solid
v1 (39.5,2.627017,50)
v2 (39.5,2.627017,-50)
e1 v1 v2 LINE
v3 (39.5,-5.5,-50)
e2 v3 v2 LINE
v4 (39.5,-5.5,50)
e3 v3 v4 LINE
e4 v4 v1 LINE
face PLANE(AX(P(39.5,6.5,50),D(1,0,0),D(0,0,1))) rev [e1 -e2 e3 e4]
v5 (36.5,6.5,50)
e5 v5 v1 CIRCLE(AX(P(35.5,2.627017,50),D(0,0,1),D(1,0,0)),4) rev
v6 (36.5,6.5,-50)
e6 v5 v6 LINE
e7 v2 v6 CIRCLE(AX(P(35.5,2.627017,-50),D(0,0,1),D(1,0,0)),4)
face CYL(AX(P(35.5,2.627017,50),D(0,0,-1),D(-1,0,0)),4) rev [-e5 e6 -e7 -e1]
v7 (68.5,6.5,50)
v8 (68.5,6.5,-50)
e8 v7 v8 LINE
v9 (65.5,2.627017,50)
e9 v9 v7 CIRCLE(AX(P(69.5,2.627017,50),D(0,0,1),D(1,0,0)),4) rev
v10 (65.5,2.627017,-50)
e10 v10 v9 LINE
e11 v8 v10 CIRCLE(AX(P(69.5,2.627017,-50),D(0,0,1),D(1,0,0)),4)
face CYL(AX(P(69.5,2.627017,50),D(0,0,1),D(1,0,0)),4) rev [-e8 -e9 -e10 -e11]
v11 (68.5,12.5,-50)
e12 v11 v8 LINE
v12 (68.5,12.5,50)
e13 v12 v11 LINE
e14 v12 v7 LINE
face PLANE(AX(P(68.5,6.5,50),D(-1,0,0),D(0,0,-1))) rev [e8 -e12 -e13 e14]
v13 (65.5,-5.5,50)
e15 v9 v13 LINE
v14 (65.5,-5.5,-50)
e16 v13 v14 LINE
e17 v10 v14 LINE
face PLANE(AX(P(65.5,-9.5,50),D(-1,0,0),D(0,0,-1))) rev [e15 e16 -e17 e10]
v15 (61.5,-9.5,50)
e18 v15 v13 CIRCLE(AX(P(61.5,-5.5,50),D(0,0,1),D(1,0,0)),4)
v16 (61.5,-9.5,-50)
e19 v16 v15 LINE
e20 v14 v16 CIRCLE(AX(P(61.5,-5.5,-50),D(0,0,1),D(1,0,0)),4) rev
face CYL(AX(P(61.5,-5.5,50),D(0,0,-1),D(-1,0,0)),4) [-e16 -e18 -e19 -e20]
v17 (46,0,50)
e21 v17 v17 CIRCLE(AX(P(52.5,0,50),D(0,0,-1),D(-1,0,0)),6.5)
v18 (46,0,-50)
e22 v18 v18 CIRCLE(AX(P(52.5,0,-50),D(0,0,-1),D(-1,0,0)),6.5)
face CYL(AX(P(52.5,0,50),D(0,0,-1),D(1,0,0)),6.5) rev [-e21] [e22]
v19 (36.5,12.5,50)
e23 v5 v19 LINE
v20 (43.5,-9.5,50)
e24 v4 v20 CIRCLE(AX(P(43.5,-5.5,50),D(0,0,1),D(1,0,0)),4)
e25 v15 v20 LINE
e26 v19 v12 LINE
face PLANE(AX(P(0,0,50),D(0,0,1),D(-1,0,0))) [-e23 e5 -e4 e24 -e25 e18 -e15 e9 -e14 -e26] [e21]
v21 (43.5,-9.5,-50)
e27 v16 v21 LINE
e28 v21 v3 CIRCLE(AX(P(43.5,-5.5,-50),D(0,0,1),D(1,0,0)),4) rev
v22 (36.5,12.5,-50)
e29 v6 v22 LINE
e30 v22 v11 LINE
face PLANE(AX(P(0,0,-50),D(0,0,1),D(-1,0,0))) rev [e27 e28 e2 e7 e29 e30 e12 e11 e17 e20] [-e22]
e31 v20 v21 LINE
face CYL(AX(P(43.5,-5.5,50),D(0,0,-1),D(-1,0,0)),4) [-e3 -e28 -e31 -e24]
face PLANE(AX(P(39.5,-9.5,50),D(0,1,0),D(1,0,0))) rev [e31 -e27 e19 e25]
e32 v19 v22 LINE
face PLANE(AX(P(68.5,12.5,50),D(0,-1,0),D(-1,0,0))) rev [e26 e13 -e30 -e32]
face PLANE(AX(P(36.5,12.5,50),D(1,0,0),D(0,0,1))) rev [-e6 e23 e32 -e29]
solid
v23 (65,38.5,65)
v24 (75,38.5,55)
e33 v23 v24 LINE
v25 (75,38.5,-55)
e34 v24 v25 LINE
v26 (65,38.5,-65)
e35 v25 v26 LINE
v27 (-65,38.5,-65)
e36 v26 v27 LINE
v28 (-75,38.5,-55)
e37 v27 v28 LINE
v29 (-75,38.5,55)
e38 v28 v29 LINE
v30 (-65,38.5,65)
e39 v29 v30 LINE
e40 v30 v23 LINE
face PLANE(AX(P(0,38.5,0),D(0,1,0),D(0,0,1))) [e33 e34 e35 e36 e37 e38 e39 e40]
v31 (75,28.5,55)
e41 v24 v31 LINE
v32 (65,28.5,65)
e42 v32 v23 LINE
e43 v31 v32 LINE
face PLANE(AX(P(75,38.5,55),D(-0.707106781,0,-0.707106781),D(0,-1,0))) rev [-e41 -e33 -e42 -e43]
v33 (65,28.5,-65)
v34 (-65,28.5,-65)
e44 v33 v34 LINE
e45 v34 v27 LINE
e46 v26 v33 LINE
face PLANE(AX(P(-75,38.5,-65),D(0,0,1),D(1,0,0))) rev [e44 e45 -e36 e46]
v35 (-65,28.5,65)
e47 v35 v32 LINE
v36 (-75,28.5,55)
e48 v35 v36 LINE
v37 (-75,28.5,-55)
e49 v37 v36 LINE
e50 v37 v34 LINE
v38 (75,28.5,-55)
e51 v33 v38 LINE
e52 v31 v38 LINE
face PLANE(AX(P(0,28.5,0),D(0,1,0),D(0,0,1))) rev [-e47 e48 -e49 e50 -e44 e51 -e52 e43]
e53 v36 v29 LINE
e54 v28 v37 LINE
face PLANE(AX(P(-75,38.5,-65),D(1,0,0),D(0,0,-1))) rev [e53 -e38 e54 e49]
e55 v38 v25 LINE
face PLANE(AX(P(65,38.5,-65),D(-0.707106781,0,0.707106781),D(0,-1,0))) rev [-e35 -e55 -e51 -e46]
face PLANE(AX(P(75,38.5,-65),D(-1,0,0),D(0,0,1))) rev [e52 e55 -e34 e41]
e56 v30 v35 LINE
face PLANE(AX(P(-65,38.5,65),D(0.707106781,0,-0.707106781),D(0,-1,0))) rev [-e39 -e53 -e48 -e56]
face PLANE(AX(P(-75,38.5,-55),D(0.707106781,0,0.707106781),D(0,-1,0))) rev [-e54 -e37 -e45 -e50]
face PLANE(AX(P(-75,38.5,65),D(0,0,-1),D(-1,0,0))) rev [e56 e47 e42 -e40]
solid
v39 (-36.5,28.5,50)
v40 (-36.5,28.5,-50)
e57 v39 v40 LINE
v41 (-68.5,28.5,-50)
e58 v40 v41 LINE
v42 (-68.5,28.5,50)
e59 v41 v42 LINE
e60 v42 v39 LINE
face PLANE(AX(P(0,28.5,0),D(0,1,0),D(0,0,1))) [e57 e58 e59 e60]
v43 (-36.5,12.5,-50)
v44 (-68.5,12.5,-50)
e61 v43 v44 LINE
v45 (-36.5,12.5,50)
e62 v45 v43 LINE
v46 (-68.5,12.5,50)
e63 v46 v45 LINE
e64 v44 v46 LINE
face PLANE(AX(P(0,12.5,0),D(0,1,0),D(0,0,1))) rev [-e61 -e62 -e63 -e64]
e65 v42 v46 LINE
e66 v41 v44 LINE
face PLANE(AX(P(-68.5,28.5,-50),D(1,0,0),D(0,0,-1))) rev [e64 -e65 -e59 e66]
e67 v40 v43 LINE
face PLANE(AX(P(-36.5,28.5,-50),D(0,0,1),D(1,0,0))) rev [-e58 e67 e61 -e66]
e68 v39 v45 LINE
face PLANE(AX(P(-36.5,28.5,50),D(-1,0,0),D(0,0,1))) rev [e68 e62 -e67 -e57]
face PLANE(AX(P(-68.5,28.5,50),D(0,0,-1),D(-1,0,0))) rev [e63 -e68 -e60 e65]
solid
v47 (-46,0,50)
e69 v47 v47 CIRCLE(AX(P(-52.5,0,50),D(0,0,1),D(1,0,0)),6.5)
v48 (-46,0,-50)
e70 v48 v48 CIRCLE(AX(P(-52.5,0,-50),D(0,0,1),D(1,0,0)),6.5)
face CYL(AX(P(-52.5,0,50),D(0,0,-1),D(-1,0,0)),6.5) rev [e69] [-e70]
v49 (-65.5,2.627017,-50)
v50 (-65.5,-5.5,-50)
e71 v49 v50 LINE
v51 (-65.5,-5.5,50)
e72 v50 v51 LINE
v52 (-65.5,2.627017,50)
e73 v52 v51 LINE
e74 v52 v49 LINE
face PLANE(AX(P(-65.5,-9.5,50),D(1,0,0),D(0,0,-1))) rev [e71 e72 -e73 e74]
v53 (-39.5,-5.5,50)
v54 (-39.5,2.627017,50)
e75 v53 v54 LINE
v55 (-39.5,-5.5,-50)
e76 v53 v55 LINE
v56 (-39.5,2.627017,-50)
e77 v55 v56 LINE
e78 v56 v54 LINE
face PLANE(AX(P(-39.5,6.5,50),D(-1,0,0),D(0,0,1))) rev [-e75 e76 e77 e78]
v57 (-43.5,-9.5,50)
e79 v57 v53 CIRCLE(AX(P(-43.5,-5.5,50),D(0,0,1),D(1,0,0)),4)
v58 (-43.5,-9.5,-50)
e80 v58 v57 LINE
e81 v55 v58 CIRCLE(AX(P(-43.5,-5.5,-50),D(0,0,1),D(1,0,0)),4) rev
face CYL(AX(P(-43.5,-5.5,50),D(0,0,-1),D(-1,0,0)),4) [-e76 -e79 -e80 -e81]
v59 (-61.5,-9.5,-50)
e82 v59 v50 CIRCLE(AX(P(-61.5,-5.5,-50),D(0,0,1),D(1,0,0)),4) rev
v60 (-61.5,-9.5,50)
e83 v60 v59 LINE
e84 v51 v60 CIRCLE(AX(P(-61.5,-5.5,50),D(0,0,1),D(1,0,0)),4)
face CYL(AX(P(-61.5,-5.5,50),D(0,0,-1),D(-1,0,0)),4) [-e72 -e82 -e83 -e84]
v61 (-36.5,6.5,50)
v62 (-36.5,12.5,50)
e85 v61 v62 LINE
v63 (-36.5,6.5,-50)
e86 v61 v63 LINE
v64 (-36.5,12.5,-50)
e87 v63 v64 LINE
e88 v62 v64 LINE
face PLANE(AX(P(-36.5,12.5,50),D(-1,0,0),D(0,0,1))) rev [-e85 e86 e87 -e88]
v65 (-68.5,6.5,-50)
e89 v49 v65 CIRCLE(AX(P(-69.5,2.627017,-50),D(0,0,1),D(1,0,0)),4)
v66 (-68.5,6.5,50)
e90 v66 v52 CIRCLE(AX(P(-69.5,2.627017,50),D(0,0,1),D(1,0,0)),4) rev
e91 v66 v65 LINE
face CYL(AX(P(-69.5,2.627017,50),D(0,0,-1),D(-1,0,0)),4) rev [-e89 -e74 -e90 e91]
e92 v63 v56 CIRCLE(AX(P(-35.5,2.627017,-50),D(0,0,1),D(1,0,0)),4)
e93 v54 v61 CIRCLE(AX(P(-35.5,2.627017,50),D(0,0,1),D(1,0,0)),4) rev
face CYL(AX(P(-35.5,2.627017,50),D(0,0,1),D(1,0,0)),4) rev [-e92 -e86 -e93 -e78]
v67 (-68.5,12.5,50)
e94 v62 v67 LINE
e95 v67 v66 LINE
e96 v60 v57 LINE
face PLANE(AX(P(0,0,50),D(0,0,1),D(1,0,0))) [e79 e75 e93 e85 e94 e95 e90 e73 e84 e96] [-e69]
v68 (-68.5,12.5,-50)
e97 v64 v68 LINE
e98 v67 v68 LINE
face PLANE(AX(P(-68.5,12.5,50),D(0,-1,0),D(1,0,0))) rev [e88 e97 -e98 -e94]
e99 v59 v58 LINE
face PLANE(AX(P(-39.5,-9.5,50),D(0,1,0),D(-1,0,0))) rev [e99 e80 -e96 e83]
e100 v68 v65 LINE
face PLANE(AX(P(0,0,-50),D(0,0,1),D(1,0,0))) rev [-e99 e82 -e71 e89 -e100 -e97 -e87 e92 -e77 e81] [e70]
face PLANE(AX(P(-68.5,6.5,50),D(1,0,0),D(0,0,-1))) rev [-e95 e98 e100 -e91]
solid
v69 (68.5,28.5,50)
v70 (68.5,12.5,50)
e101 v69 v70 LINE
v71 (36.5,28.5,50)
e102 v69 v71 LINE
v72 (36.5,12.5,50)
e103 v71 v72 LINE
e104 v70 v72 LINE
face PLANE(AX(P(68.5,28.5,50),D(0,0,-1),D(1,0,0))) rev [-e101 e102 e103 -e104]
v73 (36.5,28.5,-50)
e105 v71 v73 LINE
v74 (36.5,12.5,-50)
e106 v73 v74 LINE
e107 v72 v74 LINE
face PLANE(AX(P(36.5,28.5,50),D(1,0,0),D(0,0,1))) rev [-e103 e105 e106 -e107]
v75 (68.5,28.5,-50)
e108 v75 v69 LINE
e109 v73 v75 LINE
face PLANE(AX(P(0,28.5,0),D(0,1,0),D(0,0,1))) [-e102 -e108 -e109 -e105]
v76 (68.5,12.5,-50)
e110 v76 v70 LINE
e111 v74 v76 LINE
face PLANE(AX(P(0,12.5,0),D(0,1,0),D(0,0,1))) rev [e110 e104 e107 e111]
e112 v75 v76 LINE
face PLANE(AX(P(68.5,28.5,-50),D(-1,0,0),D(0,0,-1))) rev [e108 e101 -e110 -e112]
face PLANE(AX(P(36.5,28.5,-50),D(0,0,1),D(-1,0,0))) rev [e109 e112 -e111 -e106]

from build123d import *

# Parameters (mm, degrees)
SKETCH1_R           = 6.5
BOSS_EXTRUDE1_DEPTH = 50
SKETCH2_W           = 32
SKETCH2_H           = 100
BOSS_EXTRUDE2_DEPTH = 16
SKETCH5_W           = 150
SKETCH5_H           = 130
BOSS_EXTRUDE3_DEPTH = 10
CHAMFER1_SIZE       = 10
FILLET1_R           = 4
FILLET2_R           = 4


with BuildPart() as part:
    # Sketch1 → Boss-Extrude1 (new, symmetric)
    with BuildSketch(Plane.XY):
        Polygon((-39.5, -9.5), (-65.5, -9.5), (-65.5, 6.5), (-68.5, 6.5), (-68.5, 12.5), (-36.5, 12.5), (-36.5, 6.5), (-39.5, 6.5), align=None)
        with Locations((-52.5, 0)):
            Circle(SKETCH1_R, mode=Mode.SUBTRACT)
    extrude(amount=BOSS_EXTRUDE1_DEPTH, both=True)


with BuildPart() as body_2:
    # Sketch2 → Boss-Extrude2 (new body)
    with BuildSketch(Plane(origin=(0, 12.5, 0), x_dir=(1, 0, 0), z_dir=(0, 1, 0))):
        with Locations((-52.5, 0)):
            Rectangle(SKETCH2_W, SKETCH2_H)
    extrude(amount=BOSS_EXTRUDE2_DEPTH)


with BuildPart() as body_3:
    # Mirror5: mirrored copy
    add(body_2.part.mirror(Plane(origin=(0, 0, 0), x_dir=(0, 0, 1), z_dir=(1, 0, 0))))


with BuildPart() as body_4:
    # Mirror5 2: mirrored copy
    add(part.part.mirror(Plane(origin=(0, 0, 0), x_dir=(0, 0, 1), z_dir=(1, 0, 0))))

    # Fillet2
    # the kernel refuses this fillet: 4 mm, written as the material it adds along each edge
    with BuildSketch(Plane(origin=(65.5, 6.5, 50), x_dir=(1, 0, 0), z_dir=(0, 0, -1)), Plane(origin=(39.5, 6.5, -50), x_dir=(-1, 0, 0), z_dir=(0, 0, 1))) as fillet2_piece_1:
        with BuildLine():
            CenterArc((4, 3.872983346), FILLET2_R, 180, 75.522487814)
            Line((0, 3.872983346), (0, 0))
            Line((0, 0), (3, 0))
        make_face()
    extrude(amount=100)
    # the kernel refuses this fillet: 4 mm, written as the material it takes off along each edge
    with BuildSketch(Plane(origin=(65.5, -9.5, 60), x_dir=(-1, 0, 0), z_dir=(0, 0, -1)), Plane(origin=(39.5, -9.5, -60), x_dir=(1, 0, 0), z_dir=(0, 0, 1))) as fillet2_2_piece_1:
        with BuildLine():
            CenterArc((FILLET2_R, FILLET2_R), FILLET2_R, 180, 90)
            Line((0, FILLET2_R), (0, 0))
            Line((0, 0), (FILLET2_R, 0))
        make_face()
    extrude(amount=120, mode=Mode.SUBTRACT)


with BuildPart() as body_5:
    # Sketch5 → Boss-Extrude3 (new body)
    with BuildSketch(Plane(origin=(0, 28.5, 0), x_dir=(1, 0, 0), z_dir=(0, 1, 0))):
        Rectangle(SKETCH5_W, SKETCH5_H)
    extrude(amount=BOSS_EXTRUDE3_DEPTH)

    # Chamfer1
    chamfer1_edges = [body_5.edges().sort_by_distance(p)[0] for p in [
        (75, 33.5, 65),
        (-75, 33.5, 65),
        (-75, 33.5, -65),
        (75, 33.5, -65),
    ]]
    chamfer(chamfer1_edges, length=CHAMFER1_SIZE)


with BuildPart() as part_1:
    add(part.part)

    # Fillet1
    # the kernel refuses this fillet: 4 mm, written as the material it adds along each edge
    with BuildSketch(Plane(origin=(-39.5, 6.5, -50), x_dir=(1, 0, 0), z_dir=(0, 0, 1)), Plane(origin=(-65.5, 6.5, 50), x_dir=(-1, 0, 0), z_dir=(0, 0, -1))) as fillet1_piece_1:
        with BuildLine():
            CenterArc((4, -3.872983346), FILLET1_R, 104.477512186, 75.522487814)
            Line((0, -3.872983346), (0, 0))
            Line((0, 0), (3, 0))
        make_face()
    extrude(amount=100)
    # the kernel refuses this fillet: 4 mm, written as the material it takes off along each edge
    with BuildSketch(Plane(origin=(-39.5, -9.5, -60), x_dir=(-1, 0, 0), z_dir=(0, 0, 1)), Plane(origin=(-65.5, -9.5, 60), x_dir=(1, 0, 0), z_dir=(0, 0, -1))) as fillet1_2_piece_1:
        with BuildLine():
            CenterArc((FILLET1_R, -FILLET1_R), FILLET1_R, 90, 90)
            Line((0, -FILLET1_R), (0, 0))
            Line((0, 0), (FILLET1_R, 0))
        make_face()
    extrude(amount=120, mode=Mode.SUBTRACT)


solid = Compound([body_2.part, body_3.part, body_4.part, body_5.part, part_1.part])
